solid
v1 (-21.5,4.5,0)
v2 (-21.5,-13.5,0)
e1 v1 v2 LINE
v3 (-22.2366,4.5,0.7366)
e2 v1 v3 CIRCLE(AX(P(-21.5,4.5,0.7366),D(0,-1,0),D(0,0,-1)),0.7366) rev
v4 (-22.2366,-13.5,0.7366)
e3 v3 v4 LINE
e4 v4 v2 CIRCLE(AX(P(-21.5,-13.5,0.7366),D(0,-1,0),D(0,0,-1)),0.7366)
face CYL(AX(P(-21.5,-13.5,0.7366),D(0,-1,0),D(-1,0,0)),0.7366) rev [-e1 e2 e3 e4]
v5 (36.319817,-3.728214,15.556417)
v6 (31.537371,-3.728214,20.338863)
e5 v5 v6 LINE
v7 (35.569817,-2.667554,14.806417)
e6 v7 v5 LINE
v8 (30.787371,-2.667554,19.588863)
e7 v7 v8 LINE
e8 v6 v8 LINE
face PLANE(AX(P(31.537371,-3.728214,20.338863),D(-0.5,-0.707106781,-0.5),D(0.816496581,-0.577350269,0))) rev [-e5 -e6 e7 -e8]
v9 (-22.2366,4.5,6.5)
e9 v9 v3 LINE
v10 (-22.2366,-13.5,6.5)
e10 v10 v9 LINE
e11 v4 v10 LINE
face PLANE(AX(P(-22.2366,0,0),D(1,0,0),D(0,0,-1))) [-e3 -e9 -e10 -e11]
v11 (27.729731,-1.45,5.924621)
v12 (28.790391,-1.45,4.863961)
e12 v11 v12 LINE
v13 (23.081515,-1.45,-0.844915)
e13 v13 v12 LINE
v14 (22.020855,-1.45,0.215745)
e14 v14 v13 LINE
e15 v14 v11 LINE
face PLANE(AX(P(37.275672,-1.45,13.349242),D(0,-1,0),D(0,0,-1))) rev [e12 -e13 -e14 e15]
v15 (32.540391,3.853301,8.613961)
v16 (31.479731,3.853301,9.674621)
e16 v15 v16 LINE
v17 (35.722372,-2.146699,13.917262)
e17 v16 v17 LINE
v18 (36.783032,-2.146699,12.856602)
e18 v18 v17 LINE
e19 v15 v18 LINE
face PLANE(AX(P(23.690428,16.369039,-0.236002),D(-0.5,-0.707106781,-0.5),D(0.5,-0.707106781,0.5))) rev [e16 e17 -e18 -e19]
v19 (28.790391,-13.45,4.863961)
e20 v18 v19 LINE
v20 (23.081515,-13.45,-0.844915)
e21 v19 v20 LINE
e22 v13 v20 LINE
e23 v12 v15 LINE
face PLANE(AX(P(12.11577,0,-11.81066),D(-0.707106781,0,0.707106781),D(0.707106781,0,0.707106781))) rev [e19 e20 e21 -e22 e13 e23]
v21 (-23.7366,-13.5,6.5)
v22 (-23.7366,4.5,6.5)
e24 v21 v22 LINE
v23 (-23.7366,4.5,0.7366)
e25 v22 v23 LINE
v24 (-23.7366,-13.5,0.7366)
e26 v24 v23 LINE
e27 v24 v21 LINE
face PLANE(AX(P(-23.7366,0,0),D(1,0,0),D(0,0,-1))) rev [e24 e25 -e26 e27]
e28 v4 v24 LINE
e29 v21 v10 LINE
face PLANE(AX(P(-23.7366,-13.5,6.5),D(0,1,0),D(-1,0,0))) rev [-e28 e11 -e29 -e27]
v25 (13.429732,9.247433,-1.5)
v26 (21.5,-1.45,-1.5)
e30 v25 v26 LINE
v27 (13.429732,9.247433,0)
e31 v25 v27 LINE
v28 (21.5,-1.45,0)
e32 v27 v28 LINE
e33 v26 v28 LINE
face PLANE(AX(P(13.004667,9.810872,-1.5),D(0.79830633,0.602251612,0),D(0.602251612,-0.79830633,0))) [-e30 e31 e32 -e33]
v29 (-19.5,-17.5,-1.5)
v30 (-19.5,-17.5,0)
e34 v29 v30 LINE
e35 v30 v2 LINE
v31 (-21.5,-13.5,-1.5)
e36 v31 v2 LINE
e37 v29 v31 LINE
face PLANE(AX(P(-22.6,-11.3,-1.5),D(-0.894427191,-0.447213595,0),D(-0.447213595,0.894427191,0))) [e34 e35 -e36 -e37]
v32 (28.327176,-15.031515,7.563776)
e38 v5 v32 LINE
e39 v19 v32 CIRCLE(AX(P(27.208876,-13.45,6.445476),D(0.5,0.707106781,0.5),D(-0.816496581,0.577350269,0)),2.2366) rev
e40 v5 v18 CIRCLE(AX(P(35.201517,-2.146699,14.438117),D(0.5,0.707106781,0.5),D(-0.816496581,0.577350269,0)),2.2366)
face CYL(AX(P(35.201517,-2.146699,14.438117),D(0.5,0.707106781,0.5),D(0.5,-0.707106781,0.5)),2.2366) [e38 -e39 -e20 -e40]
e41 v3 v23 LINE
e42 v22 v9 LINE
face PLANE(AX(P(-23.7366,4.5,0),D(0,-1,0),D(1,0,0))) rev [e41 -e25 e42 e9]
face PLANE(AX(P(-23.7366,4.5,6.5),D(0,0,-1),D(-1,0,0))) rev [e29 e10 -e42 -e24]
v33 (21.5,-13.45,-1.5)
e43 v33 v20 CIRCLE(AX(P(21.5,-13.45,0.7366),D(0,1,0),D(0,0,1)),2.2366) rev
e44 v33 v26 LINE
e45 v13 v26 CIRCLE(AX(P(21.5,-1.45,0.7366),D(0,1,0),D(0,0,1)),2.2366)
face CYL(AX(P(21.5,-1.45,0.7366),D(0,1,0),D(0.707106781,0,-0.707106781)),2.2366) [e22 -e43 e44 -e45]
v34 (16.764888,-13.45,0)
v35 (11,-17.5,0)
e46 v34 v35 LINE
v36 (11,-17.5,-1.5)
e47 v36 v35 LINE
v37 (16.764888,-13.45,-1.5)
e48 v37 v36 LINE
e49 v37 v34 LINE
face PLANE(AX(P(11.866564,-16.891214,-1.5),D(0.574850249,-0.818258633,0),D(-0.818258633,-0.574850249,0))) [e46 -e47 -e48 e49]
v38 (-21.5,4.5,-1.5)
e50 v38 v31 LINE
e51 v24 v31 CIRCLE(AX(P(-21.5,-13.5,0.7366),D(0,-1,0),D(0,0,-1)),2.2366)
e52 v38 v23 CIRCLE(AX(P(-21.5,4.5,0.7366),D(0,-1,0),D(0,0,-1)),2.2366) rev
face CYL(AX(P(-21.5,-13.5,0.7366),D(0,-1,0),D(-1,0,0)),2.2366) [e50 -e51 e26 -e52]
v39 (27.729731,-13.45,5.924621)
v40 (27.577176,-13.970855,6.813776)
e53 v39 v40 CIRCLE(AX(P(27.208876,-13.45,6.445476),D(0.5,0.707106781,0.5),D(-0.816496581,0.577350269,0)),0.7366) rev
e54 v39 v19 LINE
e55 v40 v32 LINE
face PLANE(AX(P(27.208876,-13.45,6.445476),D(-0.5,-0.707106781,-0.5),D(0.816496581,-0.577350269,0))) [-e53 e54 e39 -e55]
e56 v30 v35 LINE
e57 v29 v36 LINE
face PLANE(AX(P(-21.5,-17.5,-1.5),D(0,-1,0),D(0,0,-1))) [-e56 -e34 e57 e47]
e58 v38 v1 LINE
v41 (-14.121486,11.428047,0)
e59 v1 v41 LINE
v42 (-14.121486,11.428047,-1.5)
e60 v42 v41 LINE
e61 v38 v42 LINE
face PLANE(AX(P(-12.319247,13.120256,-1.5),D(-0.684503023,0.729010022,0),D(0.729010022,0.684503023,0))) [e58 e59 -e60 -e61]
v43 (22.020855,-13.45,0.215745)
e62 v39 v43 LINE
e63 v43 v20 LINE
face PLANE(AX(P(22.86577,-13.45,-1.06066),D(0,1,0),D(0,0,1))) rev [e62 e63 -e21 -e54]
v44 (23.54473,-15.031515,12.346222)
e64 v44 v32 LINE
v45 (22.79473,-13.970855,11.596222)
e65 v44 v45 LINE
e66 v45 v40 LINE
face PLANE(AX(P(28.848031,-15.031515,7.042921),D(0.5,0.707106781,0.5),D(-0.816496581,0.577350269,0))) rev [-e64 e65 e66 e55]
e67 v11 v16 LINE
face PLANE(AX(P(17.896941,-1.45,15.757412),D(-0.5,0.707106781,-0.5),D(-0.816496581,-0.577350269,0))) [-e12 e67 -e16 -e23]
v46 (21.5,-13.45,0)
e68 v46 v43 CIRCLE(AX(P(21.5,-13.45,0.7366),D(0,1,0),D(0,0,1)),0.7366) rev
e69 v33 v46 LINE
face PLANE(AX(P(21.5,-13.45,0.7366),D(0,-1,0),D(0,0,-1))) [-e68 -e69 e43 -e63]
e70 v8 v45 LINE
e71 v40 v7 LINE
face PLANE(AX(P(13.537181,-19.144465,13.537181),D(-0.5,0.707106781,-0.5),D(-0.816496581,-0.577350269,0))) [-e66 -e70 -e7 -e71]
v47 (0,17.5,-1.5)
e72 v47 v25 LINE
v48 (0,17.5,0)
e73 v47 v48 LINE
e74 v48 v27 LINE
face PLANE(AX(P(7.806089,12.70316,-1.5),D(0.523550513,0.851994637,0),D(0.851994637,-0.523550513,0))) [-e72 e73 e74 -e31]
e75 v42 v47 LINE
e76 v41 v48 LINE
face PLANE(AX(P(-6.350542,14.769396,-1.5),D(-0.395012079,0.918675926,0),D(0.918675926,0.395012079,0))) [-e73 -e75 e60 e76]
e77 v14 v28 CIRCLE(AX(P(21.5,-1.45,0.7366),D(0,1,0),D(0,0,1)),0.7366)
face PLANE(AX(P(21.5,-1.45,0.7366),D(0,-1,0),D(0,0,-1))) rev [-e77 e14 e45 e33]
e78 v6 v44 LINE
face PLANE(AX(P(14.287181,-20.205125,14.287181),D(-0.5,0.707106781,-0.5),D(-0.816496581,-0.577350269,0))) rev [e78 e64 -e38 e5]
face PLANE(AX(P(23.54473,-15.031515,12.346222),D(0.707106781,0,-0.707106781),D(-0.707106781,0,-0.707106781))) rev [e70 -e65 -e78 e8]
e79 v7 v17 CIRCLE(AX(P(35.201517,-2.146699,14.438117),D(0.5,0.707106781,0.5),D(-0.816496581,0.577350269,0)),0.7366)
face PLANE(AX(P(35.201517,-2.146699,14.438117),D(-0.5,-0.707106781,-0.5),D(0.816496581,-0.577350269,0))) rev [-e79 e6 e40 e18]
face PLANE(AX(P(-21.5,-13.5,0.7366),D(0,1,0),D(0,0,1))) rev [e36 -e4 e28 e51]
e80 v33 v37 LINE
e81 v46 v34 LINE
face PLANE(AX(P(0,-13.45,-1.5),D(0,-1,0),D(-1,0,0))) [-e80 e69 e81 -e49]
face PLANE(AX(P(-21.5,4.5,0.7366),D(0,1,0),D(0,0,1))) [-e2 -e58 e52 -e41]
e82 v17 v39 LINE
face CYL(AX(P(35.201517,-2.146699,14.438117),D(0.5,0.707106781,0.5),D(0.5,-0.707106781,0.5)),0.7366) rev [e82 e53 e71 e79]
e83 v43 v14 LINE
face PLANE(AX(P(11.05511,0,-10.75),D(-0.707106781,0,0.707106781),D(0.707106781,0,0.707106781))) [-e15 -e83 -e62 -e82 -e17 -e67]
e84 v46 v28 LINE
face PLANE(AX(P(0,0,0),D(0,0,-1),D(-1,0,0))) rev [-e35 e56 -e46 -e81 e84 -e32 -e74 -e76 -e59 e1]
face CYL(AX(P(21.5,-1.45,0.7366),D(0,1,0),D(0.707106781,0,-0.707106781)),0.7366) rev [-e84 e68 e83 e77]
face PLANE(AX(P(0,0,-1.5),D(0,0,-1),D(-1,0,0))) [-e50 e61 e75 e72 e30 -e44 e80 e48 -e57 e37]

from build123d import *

# Parameters (mm, degrees)
CROQUIS1_W              = 43
CROQUIS1_H              = 35
BRIDA_BASE1_DEPTH       = 1.5
CROQUIS6_W              = 59.566817112
CROQUIS6_H              = 45.88022185
CORTAR_EXTRUIR1_DEPTH   = 10
BRIDA_DE_ARISTA1_DEPTH  = 18
BRIDA_DE_ARISTA2_DEPTH  = 12
CORTAR_EXTRUIR2_DEPTH   = 10
SALIENTE_EXTRUIR1_DEPTH = 1.5
CORTAR_EXTRUIR3_DEPTH   = 10
BRIDA_DE_ARISTA3_DEPTH  = 15.985281374


# Sheet-metal steps are written as plain solids
with BuildPart() as part:
    # Croquis1 → Brida base1 (new body)
    with BuildSketch(Plane.XY):
        Rectangle(CROQUIS1_W, CROQUIS1_H)
    extrude(amount=-BRIDA_BASE1_DEPTH)

    # Croquis6 → Cortar-Extruir1 (cut)
    with BuildSketch(Plane.XY):
        Rectangle(CROQUIS6_W, CROQUIS6_H)
        Polygon((11, -17.5), (16.764888282, -13.45), (21.5, -13.45), (21.5, -1.45), (13.429731846, 9.247432799), (0, 17.5), (-14.121485549, 11.428046656), (-21.5, 4.5), (-21.5, -13.5), (-19.5, -17.5), align=None, mode=Mode.SUBTRACT)
    extrude(amount=-CORTAR_EXTRUIR1_DEPTH, mode=Mode.SUBTRACT)

    # Brida de arista1 section (across the edge) → Brida de arista1 (add)
    with BuildSketch(Plane(origin=(-22.2366, 4.5, 0), x_dir=(1, 0, 0), z_dir=(0, -1, 0))):
        with BuildLine():
            Line((-1.5, 0.7366), (-1.5, 6.5))
            Line((-1.5, 6.5), (0, 6.5))
            Line((0, 6.5), (0, 0.7366))
            ThreePointArc((0, 0.7366), (0.215745145, 0.215745145), (0.7366, 0))
            Line((0.7366, 0), (0.7366, -1.5))
            ThreePointArc((0.7366, -1.5), (-0.844915027, -0.844915027), (-1.5, 0.7366))
        make_face()
    extrude(amount=BRIDA_DE_ARISTA1_DEPTH)

    # Brida de arista2 section (across the edge) → Brida de arista2 (add)
    with BuildSketch(Plane(origin=(21.80510971, -13.45, 0), x_dir=(-0.7071067811865438, 0, 0.7071067811865512), z_dir=(0, 1, 0))):
        with BuildLine():
            Line((-1.5, 0.30510971), (-1.5, 20.378679656))
            Line((-1.5, 20.378679656), (0, 20.378679656))
            Line((0, 20.378679656), (0, 0.30510971))
            ThreePointArc((0, 0.30510971), (0.056070336, 0.023225094), (0.215745145, -0.215745145))
            Line((0.215745145, -0.215745145), (-0.844915027, -1.276405317))
            ThreePointArc((-0.844915027, -1.276405317), (-1.329748962, -0.550800055), (-1.5, 0.30510971))
        make_face()
    extrude(amount=BRIDA_DE_ARISTA2_DEPTH)

    # Croquis13 → Cortar-Extruir2 (cut)
    with BuildSketch(Plane(origin=(11.963215027, 0, -11.963215027), x_dir=(-0.7071067811865513, 0, -0.7071067811865438), z_dir=(0.7071067811865438, 0, -0.7071067811865513))):
        Polygon((-35.797220597, -1.45), (-23.797220597, -13.45), (-35.797220597, -13.45), align=None)
    extrude(amount=-CORTAR_EXTRUIR2_DEPTH, mode=Mode.SUBTRACT)

    # Croquis14 → Saliente-Extruir1 (add)
    with BuildSketch(Plane(origin=(11.963215027, 0, -11.963215027), x_dir=(-0.7071067811865513, 0, -0.7071067811865438), z_dir=(0.7071067811865438, 0, -0.7071067811865513))):
        Polygon((-35.797220597, -1.45), (-23.797220597, -1.45), (-30.161181628, 4.913961031), (-36.161181628, -1.086038969), align=None)
    extrude(amount=-SALIENTE_EXTRUIR1_DEPTH)

    # Croquis15 → Cortar-Extruir3 (cut)
    with BuildSketch(Plane(origin=(10.902554855, 0, -10.902554855), x_dir=(0.7071067811865513, 0, 0.7071067811865438), z_dir=(-0.7071067811865438, 0, 0.7071067811865513))):
        Polygon((30.161181628, 4.913961031), (36.161181628, -1.086038969), (35.100521456, -2.146699141), (29.100521456, 3.853300859), align=None)
    extrude(amount=-CORTAR_EXTRUIR3_DEPTH, mode=Mode.SUBTRACT)

    # Brida de arista3 section (across the edge) → Brida de arista3 (add)
    with BuildSketch(Plane(origin=(28.098030913, -13.970854855, 6.292921202), x_dir=(-0.5000000000000027, 0.7071067811865511, -0.4999999999999924), z_dir=(0.5000000000000054, 0.7071067811865441, 0.49999999999999967))):
        with BuildLine():
            Line((-1.5, 0.7366), (-1.5, 7.5))
            Line((-1.5, 7.5), (0, 7.5))
            Line((0, 7.5), (0, 0.7366))
            ThreePointArc((0, 0.7366), (0.215745145, 0.215745145), (0.7366, 0))
            Line((0.7366, 0), (0.7366, -1.5))
            ThreePointArc((0.7366, -1.5), (-0.844915027, -0.844915027), (-1.5, 0.7366))
        make_face()
    extrude(amount=BRIDA_DE_ARISTA3_DEPTH)


solid = part.part
